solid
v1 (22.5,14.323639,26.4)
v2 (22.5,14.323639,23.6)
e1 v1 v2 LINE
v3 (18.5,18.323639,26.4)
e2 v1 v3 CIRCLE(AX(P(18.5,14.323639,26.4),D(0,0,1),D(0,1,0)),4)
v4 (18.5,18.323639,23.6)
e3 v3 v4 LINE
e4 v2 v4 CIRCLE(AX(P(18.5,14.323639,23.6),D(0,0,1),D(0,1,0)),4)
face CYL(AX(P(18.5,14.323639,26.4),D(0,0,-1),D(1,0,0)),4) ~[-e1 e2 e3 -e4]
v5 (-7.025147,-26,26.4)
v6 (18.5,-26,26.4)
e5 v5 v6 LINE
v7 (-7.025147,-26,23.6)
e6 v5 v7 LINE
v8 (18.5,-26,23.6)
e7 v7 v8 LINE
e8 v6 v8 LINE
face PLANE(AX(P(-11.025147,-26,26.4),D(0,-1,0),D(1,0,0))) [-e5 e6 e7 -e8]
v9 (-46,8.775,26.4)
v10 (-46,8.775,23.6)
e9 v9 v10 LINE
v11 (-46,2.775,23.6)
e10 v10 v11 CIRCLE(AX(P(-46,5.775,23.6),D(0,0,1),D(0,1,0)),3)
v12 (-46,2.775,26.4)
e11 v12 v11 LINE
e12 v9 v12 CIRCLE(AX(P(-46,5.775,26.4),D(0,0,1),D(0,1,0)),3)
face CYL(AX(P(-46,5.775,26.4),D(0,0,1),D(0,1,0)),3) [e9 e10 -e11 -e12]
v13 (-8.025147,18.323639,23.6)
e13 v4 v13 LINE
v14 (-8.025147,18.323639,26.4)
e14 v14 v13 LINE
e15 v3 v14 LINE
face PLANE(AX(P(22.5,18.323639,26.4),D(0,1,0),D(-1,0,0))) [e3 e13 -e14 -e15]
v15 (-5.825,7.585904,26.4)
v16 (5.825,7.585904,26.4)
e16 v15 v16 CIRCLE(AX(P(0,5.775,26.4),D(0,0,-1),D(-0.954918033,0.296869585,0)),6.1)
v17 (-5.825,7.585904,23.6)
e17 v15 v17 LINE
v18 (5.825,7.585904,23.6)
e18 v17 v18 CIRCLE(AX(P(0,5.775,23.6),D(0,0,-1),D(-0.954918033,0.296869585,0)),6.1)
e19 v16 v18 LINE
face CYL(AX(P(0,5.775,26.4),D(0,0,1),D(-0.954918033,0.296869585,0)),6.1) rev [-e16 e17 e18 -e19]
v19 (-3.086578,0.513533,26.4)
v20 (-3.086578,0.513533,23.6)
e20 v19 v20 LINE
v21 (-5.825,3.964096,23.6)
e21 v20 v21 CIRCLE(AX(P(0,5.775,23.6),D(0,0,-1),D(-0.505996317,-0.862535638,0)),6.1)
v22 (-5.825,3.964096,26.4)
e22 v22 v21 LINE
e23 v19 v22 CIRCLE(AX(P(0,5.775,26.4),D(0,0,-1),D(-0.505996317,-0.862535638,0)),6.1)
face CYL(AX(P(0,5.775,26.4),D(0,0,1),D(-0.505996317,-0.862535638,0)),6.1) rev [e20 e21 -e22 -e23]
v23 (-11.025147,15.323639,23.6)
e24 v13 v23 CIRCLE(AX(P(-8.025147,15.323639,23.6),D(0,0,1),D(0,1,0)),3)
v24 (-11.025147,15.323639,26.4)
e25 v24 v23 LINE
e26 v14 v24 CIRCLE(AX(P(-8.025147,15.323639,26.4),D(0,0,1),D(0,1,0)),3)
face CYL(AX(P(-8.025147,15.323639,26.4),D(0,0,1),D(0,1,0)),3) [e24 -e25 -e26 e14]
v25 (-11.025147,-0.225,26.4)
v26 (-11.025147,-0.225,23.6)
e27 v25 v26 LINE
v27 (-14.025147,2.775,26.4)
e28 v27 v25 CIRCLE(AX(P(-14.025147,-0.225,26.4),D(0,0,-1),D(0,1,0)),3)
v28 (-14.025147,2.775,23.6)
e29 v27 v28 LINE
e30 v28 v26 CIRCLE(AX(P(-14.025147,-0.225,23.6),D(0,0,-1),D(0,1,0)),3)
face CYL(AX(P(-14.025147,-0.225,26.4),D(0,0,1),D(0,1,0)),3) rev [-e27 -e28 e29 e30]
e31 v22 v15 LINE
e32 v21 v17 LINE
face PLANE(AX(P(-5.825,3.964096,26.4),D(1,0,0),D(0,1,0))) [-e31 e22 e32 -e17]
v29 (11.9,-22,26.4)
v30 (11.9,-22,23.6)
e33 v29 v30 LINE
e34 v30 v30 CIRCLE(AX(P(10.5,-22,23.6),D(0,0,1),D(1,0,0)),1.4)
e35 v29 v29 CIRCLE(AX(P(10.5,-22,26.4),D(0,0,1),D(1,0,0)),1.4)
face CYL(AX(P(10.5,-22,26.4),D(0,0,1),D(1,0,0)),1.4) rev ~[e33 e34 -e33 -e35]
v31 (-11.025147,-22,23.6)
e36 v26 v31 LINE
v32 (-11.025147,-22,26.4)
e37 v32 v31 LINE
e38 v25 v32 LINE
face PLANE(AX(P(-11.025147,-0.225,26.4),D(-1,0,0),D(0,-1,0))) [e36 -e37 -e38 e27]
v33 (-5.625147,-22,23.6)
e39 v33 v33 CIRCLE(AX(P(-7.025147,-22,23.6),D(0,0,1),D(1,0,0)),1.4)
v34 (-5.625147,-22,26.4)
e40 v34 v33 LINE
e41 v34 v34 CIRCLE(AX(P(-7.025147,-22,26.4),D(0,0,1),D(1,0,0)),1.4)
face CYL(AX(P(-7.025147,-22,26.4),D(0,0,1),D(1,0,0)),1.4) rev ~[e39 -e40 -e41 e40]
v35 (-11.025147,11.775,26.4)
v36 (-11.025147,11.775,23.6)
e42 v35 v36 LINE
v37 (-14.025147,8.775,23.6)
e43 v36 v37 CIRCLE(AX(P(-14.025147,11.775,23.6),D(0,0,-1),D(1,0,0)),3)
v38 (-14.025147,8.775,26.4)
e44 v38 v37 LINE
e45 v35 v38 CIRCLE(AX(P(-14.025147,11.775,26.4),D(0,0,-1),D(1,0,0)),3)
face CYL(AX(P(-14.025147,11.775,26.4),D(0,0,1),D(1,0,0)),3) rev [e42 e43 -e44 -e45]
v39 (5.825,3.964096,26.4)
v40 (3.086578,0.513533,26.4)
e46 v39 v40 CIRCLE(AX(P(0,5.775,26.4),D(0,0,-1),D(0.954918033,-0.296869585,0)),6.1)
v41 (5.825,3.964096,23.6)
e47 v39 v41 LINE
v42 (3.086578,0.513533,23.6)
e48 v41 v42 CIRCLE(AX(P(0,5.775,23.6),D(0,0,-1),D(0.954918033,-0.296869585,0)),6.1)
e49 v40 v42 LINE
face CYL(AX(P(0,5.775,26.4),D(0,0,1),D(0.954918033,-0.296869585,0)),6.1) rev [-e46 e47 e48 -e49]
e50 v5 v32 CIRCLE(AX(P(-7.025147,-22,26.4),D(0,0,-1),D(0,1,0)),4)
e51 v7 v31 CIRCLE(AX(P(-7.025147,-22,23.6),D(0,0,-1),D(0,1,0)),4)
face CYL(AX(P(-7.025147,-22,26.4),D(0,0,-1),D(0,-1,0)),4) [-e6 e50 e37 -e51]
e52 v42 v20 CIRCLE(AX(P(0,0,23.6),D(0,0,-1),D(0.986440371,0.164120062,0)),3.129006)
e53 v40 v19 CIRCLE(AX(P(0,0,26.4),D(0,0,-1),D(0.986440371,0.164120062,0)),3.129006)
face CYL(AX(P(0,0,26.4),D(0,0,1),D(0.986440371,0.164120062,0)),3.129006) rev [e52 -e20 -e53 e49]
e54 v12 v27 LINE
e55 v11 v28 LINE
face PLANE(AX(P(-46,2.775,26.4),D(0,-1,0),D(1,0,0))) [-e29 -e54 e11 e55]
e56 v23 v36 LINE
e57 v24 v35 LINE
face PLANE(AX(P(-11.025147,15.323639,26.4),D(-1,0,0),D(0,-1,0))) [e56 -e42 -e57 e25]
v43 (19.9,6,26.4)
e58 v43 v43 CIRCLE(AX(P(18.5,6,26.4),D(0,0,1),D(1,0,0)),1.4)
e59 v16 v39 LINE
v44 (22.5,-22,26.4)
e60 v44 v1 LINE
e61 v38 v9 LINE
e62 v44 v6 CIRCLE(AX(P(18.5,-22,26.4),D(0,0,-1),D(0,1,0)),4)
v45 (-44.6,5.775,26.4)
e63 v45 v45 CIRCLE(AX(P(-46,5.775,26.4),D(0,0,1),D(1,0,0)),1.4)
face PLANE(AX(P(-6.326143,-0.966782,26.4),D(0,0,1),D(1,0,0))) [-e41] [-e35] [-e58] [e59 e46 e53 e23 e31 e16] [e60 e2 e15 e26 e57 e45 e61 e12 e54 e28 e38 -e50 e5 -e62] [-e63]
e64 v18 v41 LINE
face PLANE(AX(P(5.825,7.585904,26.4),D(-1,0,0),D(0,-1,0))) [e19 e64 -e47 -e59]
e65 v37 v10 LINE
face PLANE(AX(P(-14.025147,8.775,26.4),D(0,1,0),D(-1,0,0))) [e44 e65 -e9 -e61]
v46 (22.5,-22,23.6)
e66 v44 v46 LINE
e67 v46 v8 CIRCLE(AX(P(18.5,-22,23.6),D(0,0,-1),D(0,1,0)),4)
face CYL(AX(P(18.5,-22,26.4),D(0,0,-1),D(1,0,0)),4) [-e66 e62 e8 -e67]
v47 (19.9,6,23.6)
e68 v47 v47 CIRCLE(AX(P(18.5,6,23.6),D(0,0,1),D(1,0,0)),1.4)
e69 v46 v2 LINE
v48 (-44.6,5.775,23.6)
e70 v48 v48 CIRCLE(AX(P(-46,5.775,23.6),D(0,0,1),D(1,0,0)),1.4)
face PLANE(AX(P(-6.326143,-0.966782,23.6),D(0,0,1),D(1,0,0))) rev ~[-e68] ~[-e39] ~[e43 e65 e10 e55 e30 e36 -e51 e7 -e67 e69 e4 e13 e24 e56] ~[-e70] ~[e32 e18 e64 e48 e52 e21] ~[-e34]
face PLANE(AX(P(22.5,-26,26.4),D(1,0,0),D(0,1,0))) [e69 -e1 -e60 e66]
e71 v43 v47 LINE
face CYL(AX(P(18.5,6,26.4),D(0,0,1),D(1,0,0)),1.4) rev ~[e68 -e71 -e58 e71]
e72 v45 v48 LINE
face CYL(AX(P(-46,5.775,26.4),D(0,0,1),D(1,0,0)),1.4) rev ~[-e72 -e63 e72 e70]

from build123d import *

# Parameters (mm, degrees)
F0_W     = 11.65
F0_H     = 23.75
F1_DEPTH = 20.4
F3_DEPTH = 6
F5_START = -0.8
F4_W     = 11.65
F4_H     = 4.2
F5_DEPTH = 2
F6_R     = 0.5
F7_R     = 1
F8_R     = 1.4
F9_DEPTH = 2.8
F10_R    = 4


# Not quite as in the source:
# - a feature names something its author has since deleted; it is built from what else it names


with BuildPart() as f1:
    # F0 (on Top) → F1 (new body)
    with BuildSketch(Plane.XY):
        Rectangle(F0_W, F0_H)
    extrude(amount=F1_DEPTH)

    # F2 (on face) → F3 (join)
    with BuildSketch(Plane.XY.offset(20.4)):
        with BuildLine():
            Line((5.825, 3.9640955299), (5.825, 7.5859044701))
            ThreePointArc((5.825, 7.5859044701), (0, 11.875), (-5.825, 7.5859044701))
            Line((-5.825, 7.5859044701), (-5.825, 3.9640955299))
            ThreePointArc((-5.825, 3.9640955299), (-4.7781429098, 1.9829886164), (-3.0865775367, 0.5135326087))
            ThreePointArc((-3.0865775367, 0.5135326087), (0, -3.1), (3.0865775367, 0.5135326087))
            ThreePointArc((3.0865775367, 0.5135326087), (4.7781429098, 1.9829886164), (5.825, 3.9640955299))
        make_face()
    extrude(amount=F3_DEPTH)

    # F4 (on face) → F5 (join)
    with BuildSketch(Plane.XY.offset(20.4).offset(F5_START)):
        with Locations((0, -13.975)):
            Rectangle(F4_W, F4_H)
        with Locations((0, 13.975)):
            Rectangle(F4_W, F4_H)
    extrude(amount=-F5_DEPTH)

    # F6
    f6_edges = [f1.edges().sort_by_distance(p)[0] for p in [
        (5.825, 11.875, 8.8),
        (5.825, -11.875, 8.8),
        (-5.825, -11.875, 8.8),
        (-5.825, 11.875, 8.8),
    ]]
    fillet(f6_edges, radius=F6_R)

    # F7
    f7_edges = [f1.edges().sort_by_distance(p)[0] for p in [
        (-5.825, 16.075, 18.6),
        (5.825, 16.075, 18.6),
        (5.825, -16.075, 18.6),
        (-5.825, -16.075, 18.6),
    ]]
    fillet(f7_edges, radius=F7_R)


with BuildPart() as f9:
    # F8 (on face) → F9 (new body)
    with BuildSketch(Plane.XY.offset(26.4)):
        with BuildLine():
            Line((22.5, -26), (22.5, 18.3236394078))
            Line((22.5, 18.3236394078), (1.6129450202, 18.3236394078))
            Line((1.6129450202, 18.3236394078), (-8.0251465812, 18.3236394078))
            ThreePointArc((-8.0251465812, 18.3236394078), (-10.1464669248, 17.4449597513), (-11.0251465812, 15.3236394078))
            Line((-11.0251465812, 15.3236394078), (-11.0251465812, 11.775))
            ThreePointArc((-11.0251465812, 11.775), (-11.9038262377, 9.6536796564), (-14.0251465812, 8.775))
            Line((-14.0251465812, 8.775), (-46, 8.775))
            ThreePointArc((-46, 8.775), (-49, 5.775), (-46, 2.775))
            Line((-46, 2.775), (-14.0251465812, 2.775))
            ThreePointArc((-14.0251465812, 2.775), (-11.9038262377, 1.8963203436), (-11.0251465812, -0.225))
            Line((-11.0251465812, -0.225), (-11.0251465812, -15.0673655123))
            Line((-11.0251465812, -15.0673655123), (-11.0251465812, -26))
            Line((-11.0251465812, -26), (22.5, -26))
        make_face()
        with Locations((-7.0251465812, -22)):
            Circle(F8_R, mode=Mode.SUBTRACT)
        with Locations((10.5, -22)):
            Circle(F8_R, mode=Mode.SUBTRACT)
        with Locations((-46, 5.775)):
            Circle(F8_R, mode=Mode.SUBTRACT)
        with BuildLine():
            ThreePointArc((5.825, 3.9640955299), (4.7781429098, 1.9829886164), (3.0865775367, 0.5135326087))
            ThreePointArc((3.0865775367, 0.5135326087), (0, -3.1290056936), (-3.0865775367, 0.5135326087))
            ThreePointArc((-3.0865775367, 0.5135326087), (-4.7781429098, 1.9829886164), (-5.825, 3.9640955299))
            Line((-5.825, 3.9640955299), (-5.825, 7.5859044701))
            ThreePointArc((-5.825, 7.5859044701), (0, 11.875), (5.825, 7.5859044701))
            Line((5.825, 7.5859044701), (5.825, 3.9640955299))
        make_face(mode=Mode.SUBTRACT)
        with Locations((18.5, 6)):
            Circle(F8_R, mode=Mode.SUBTRACT)
    extrude(amount=-F9_DEPTH)

    # F10
    f10_edges = [f9.edges().sort_by_distance(p)[0] for p in [
        (-11.025147, -26, 25),
        (22.5, -26, 25),
        (22.5, 18.323639, 25),
    ]]
    fillet(f10_edges, radius=F10_R)


with BuildPart() as f11_1:
    # F11: copy of F9
    add(f9.part)


solid = f9.part
